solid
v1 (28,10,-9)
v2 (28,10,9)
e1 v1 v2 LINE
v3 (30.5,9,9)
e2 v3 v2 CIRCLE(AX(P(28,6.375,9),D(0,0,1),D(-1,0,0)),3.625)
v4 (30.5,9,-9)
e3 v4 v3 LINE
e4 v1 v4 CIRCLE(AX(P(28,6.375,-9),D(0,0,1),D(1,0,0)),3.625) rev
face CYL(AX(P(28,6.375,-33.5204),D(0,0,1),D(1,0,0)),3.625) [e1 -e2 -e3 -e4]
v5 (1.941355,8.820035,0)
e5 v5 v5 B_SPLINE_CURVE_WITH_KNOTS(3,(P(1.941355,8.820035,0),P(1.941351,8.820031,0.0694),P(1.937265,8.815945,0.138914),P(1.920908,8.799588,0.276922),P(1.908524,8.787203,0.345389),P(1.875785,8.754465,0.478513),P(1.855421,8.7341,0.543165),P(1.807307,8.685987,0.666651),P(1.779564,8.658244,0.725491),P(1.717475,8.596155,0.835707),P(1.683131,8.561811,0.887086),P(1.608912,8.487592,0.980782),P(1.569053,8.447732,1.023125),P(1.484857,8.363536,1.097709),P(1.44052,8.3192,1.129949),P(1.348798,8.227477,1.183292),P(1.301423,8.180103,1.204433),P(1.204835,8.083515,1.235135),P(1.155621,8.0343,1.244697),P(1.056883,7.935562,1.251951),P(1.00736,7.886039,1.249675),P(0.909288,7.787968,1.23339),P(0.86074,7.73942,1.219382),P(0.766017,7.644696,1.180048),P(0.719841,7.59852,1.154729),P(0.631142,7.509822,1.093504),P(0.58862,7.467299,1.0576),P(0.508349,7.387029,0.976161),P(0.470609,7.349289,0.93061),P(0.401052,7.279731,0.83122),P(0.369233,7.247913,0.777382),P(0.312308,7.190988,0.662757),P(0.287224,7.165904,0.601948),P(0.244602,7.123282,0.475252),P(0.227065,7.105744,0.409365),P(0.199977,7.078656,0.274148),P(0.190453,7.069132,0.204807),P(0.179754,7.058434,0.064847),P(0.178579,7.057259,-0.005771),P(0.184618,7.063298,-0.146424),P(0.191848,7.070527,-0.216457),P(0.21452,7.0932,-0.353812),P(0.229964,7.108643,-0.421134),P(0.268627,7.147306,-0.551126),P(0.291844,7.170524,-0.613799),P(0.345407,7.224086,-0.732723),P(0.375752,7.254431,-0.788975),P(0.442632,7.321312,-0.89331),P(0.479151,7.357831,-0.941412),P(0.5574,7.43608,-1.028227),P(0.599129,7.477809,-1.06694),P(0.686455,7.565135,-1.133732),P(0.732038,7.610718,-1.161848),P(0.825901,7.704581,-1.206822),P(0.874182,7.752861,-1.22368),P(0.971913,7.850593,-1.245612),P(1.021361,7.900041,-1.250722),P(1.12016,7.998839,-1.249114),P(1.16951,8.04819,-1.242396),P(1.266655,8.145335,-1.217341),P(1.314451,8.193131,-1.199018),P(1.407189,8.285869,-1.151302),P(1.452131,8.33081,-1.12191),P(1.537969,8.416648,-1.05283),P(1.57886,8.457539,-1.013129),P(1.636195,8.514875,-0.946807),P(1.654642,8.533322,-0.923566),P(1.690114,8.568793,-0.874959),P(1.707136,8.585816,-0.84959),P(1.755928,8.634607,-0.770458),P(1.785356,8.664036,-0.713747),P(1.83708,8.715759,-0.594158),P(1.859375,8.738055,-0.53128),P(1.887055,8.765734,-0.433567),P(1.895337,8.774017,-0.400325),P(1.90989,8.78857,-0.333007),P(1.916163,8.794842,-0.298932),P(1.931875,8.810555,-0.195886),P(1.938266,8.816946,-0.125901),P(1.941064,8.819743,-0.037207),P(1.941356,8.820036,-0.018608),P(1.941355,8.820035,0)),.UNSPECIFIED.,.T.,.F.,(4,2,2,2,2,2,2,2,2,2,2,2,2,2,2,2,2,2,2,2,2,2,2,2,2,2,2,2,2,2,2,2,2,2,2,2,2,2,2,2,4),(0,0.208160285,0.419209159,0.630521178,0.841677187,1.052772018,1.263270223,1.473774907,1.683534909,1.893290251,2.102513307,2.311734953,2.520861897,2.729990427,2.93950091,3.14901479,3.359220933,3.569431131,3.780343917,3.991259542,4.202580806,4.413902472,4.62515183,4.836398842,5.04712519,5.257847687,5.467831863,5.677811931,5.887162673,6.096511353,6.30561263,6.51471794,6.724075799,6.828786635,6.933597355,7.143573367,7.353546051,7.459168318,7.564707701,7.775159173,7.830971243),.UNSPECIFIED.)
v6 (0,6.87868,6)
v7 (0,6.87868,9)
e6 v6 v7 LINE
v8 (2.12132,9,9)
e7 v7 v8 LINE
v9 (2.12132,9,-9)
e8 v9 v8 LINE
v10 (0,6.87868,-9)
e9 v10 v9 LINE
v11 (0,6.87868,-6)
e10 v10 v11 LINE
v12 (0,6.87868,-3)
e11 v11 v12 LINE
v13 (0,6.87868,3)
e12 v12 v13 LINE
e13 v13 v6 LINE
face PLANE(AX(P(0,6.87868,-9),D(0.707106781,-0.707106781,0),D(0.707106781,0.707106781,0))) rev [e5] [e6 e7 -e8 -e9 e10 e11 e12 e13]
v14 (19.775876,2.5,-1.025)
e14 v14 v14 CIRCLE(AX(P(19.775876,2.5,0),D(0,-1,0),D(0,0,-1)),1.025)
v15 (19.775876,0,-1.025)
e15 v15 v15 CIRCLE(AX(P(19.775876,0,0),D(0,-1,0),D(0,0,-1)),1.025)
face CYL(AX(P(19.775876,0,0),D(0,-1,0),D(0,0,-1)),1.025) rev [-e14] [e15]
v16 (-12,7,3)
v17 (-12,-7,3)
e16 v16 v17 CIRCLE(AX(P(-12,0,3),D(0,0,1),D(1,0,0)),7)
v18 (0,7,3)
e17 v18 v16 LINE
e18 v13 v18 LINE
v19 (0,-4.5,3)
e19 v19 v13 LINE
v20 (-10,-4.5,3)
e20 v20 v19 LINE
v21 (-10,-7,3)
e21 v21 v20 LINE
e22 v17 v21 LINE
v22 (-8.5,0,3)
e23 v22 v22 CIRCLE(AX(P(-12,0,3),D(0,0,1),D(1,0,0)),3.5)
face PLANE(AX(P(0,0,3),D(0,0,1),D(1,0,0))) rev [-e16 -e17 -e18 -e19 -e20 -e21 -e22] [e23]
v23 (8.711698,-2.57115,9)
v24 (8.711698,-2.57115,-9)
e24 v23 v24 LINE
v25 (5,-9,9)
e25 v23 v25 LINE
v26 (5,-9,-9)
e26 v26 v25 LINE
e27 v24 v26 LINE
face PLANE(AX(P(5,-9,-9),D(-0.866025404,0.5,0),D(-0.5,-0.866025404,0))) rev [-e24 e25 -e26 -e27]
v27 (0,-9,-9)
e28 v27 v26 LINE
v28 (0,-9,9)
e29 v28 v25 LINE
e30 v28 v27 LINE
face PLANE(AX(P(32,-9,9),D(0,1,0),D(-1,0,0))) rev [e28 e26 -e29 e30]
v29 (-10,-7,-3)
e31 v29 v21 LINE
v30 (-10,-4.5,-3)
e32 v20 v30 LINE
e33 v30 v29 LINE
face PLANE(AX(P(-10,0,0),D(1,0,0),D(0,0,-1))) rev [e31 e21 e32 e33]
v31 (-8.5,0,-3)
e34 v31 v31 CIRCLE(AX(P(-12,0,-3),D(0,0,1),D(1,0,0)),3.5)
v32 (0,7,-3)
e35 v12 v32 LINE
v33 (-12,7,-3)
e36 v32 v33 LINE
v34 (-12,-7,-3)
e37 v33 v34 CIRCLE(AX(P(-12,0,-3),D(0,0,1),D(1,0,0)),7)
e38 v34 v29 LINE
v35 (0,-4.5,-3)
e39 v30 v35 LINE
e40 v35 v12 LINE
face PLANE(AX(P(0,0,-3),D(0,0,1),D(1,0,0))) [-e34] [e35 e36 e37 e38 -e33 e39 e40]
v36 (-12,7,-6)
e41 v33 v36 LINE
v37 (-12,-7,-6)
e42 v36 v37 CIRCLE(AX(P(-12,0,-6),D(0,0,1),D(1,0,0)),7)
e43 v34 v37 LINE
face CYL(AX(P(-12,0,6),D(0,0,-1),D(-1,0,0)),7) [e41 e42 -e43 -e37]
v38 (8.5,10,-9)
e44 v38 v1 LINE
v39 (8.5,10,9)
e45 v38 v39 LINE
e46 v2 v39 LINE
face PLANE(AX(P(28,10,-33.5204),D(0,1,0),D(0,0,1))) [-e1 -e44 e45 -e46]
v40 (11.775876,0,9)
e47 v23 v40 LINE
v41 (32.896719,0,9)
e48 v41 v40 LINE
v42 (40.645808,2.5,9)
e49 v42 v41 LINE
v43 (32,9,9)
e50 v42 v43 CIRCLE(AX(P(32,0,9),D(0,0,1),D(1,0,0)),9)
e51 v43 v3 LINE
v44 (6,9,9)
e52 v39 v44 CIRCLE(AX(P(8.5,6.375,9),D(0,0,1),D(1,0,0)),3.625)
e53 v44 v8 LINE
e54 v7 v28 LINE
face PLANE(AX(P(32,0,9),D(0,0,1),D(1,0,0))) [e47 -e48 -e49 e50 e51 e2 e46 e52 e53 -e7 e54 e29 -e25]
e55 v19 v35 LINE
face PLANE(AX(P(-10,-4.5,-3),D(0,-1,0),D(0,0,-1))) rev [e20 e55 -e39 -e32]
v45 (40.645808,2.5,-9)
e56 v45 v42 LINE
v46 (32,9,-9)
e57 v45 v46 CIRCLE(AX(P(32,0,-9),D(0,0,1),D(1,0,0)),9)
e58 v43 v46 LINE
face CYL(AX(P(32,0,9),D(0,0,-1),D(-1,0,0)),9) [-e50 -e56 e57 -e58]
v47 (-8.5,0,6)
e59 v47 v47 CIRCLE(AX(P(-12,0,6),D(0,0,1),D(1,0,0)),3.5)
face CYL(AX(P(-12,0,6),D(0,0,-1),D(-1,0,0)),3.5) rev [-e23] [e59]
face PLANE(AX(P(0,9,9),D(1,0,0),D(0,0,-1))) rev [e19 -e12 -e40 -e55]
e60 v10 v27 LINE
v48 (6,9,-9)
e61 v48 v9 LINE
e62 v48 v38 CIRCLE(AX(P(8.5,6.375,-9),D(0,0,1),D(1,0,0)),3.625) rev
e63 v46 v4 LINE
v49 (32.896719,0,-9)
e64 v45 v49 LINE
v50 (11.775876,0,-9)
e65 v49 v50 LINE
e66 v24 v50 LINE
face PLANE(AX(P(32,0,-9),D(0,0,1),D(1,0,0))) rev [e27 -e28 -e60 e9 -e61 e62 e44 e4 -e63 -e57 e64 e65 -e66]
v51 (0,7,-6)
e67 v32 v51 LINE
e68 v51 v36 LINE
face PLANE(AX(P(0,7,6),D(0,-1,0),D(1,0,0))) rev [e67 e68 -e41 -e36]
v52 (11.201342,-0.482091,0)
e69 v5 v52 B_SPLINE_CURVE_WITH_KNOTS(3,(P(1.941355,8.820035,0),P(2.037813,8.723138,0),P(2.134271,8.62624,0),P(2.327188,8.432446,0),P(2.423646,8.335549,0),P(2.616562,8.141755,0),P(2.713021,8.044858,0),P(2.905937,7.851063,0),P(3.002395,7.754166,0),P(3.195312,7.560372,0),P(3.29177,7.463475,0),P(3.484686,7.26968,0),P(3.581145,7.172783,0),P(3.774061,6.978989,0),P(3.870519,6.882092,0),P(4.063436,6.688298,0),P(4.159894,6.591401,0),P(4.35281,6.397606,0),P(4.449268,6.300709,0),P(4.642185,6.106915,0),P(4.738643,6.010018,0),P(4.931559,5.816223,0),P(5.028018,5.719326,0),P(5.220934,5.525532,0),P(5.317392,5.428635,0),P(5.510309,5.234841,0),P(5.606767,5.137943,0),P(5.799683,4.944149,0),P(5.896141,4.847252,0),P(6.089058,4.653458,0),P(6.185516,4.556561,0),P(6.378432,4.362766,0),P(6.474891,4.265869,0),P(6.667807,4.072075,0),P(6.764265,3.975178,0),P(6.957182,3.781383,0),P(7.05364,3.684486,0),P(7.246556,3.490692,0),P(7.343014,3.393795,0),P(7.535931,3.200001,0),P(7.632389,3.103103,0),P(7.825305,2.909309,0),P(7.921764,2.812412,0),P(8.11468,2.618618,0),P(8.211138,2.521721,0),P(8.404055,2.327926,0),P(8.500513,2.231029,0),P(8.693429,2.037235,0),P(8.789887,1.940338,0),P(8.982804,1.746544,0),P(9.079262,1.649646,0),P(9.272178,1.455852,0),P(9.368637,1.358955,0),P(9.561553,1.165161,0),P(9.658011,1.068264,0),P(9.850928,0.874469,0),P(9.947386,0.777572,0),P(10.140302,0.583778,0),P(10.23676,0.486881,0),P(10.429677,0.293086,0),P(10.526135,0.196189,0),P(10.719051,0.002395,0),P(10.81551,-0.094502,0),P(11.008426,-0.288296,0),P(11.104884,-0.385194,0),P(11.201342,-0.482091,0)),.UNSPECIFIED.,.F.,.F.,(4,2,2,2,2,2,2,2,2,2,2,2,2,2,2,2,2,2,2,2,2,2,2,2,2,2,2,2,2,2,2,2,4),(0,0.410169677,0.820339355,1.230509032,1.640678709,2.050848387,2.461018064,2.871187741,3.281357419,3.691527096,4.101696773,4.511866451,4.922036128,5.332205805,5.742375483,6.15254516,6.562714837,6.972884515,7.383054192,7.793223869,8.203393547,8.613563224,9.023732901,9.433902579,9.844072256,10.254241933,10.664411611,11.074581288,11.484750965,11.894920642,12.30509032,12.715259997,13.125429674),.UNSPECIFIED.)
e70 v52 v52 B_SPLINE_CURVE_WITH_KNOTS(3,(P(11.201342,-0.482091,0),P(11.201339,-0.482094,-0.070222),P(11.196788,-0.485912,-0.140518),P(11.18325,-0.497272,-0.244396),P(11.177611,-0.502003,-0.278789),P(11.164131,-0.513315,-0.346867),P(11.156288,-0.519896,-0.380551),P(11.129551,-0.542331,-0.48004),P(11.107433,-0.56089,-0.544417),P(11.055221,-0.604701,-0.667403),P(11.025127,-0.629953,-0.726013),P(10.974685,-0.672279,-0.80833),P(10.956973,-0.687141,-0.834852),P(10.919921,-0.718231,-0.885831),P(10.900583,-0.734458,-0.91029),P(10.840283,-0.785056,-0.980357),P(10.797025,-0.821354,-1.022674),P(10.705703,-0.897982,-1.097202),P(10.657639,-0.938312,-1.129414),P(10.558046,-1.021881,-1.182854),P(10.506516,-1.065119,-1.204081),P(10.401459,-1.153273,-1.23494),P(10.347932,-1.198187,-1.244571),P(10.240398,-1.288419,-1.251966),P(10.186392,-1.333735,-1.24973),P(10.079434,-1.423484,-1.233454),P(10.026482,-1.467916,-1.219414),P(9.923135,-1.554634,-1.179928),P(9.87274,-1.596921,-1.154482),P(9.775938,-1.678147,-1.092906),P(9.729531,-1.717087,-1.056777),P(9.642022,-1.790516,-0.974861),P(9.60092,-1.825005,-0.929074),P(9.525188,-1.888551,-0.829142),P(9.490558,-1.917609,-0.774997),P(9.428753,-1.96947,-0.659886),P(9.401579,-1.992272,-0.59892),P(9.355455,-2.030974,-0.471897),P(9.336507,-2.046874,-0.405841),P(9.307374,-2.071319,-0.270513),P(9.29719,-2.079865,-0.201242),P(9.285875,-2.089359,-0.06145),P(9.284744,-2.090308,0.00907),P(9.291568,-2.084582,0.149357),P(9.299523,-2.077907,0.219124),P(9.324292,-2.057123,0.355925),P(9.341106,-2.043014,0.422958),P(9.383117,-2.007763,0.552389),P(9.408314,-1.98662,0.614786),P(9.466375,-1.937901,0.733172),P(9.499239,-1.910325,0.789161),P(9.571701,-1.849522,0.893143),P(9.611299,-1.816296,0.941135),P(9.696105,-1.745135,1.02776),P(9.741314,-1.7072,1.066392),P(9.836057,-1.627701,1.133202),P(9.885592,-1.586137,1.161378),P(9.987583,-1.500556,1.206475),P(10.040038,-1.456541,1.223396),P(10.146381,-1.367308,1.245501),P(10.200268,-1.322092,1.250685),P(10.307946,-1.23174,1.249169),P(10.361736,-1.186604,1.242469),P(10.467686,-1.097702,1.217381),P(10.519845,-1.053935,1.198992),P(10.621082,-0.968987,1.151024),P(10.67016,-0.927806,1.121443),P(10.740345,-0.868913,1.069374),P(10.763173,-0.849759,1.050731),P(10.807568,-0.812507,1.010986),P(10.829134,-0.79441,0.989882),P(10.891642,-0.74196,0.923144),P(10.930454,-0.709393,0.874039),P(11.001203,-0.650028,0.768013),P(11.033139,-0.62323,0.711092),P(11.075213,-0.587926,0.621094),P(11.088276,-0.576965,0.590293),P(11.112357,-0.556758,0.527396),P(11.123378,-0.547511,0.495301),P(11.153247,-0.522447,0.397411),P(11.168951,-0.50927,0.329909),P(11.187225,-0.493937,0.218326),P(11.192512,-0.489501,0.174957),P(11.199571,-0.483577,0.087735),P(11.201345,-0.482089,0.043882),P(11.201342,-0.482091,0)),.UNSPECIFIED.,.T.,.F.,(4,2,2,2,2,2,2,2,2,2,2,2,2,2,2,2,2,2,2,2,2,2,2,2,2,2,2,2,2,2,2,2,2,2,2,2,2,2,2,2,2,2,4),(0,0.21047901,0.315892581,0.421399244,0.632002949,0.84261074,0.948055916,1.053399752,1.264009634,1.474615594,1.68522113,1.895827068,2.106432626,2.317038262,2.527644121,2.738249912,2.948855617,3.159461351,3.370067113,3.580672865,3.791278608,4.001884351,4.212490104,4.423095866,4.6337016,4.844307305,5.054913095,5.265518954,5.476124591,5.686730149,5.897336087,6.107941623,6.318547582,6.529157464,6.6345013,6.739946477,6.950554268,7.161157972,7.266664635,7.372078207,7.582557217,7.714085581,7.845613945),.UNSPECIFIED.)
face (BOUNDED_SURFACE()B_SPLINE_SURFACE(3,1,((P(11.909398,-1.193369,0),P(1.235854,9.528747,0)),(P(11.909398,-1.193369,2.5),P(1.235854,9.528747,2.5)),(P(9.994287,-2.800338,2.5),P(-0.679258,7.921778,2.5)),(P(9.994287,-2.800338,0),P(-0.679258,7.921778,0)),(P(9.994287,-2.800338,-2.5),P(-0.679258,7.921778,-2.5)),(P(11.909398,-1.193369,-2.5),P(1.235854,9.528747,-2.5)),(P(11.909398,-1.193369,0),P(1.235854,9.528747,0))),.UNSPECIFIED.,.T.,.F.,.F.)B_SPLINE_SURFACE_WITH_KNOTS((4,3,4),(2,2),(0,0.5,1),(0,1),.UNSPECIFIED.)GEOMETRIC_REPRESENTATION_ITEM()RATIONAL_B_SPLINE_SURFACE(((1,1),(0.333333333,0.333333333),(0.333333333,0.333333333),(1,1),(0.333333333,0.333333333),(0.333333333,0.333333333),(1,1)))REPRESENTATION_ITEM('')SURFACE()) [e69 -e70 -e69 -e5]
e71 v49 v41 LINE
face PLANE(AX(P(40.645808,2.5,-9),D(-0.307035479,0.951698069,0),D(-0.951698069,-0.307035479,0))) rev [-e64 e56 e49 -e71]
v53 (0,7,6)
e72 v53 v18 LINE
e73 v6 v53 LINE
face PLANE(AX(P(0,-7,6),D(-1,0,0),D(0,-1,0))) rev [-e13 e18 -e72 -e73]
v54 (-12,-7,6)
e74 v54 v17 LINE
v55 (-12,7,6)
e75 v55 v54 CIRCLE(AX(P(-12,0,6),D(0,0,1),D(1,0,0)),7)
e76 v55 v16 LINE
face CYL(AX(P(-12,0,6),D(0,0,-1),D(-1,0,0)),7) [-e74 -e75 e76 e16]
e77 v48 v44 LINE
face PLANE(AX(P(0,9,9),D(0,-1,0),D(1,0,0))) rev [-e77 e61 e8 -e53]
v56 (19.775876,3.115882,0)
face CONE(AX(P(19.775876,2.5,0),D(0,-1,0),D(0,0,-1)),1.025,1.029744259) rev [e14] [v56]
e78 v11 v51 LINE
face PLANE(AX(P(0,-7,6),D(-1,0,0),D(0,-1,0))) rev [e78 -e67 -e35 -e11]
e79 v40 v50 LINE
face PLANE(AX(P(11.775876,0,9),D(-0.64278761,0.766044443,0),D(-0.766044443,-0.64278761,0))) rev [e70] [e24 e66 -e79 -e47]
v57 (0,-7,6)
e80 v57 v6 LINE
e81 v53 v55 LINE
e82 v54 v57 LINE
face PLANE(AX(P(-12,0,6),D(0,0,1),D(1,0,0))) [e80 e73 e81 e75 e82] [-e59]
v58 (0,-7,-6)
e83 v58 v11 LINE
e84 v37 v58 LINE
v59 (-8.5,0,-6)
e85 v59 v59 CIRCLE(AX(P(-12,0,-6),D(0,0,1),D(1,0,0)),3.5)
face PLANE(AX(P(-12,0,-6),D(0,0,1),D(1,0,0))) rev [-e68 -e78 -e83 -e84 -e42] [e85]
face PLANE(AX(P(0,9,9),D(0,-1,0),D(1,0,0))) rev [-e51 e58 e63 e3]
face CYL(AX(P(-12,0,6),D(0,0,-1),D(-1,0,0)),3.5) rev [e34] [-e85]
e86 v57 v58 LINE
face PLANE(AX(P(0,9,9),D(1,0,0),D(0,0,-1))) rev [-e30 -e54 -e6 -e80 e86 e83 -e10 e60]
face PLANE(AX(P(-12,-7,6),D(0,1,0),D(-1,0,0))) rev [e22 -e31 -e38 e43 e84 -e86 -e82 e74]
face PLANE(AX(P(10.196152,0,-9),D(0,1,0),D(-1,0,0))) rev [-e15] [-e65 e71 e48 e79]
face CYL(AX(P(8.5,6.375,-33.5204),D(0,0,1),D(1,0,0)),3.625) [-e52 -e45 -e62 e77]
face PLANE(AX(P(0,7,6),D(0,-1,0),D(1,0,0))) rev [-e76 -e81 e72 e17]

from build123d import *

# Parameters (mm, degrees)
EXTRUDE_472_DEPTH        = 9
CUT_EXTRUDE_914_DEPTH    = 46.672748987
EXTRUDE_3_DEPTH          = 18
CUT_EXTRUDE_3_DEPTH      = 46.564039844
EXTRUDE_5_DEPTH          = 9
SWEEP_START              = -4.881222858
SWEEP_1_DEPTH            = 13.189100313
SKETCH_5_R               = 3.5
EXTRUDE_2_DEPTH          = 6
SKETCH_11_W              = 23.723512942
SKETCH_11_H              = 14
CUT_EXTRUDE_4_DEPTH      = 3
SKETCH_12_W              = 6
SKETCH_12_H              = 2.5
EXTRUDE_4_DEPTH          = 10
HOLE_WIZARD_M2_5_2_D     = 2.05
HOLE_WIZARD_M2_5_2_DEPTH = 2.5
HOLE_WIZARD_M2_5_2_TIP   = 0.615882135


with BuildPart() as part:
    # 草图1 → Extrude 472 (new, symmetric)
    with BuildSketch(Plane.XY):
        with BuildLine():
            Line((0, 9), (32, 9))
            ThreePointArc((32, 9), (41, 0), (32, -9))
            Line((32, -9), (0, -9))
            Line((0, -9), (0, 9))
        make_face()
    extrude(amount=EXTRUDE_472_DEPTH, both=True)

    # 草图13 → Cut-Extrude 914 (cut, through all)
    with BuildSketch(Plane.XY.offset(9)):
        with BuildLine():
            Line((5, -9), (32, -9))
            ThreePointArc((32, -9), (39.193747285, -5.408326913), (40.645808233, 2.5))
            Line((40.645808233, 2.5), (32.896719487, 0))
            Line((32.896719487, 0), (10.196152423, 0))
            Line((10.196152423, 0), (5, -9))
        make_face()
    extrude(amount=-CUT_EXTRUDE_914_DEPTH, mode=Mode.SUBTRACT)

    # 草图6 → 凸台-拉伸3 (add)
    with BuildSketch(Plane.XY.offset(9)):
        with BuildLine():
            Line((28, 10), (8.5, 10))
            ThreePointArc((8.5, 10), (7.153708798, 9.740728004), (6, 9))
            Line((6, 9), (30.5, 9))
            ThreePointArc((30.5, 9), (29.346291202, 9.740728004), (28, 10))
        make_face()
    extrude(amount=-EXTRUDE_3_DEPTH)

    # 草图7 → 切除-拉伸3 (cut, through all)
    with BuildSketch(Plane.XY.offset(9)):
        Polygon((2.121320344, 9), (0, 9), (0, 6.878679656), align=None)
    extrude(amount=-CUT_EXTRUDE_3_DEPTH, mode=Mode.SUBTRACT)

    # 草图14 → 凸台-拉伸5 (add, symmetric)
    with BuildSketch(Plane.XY):
        Polygon((11.775875797, 0), (8.711698025, -2.571150439), (8.711698025, 0), align=None)
    extrude(amount=EXTRUDE_5_DEPTH, both=True)

    # 切除-扫描1: read off the stored shape, not the designer's step
    # 切除-扫描1 outline → 切除-扫描1 (cut)
    with BuildSketch(Plane(origin=(0, 0, 0), x_dir=(0.7087101663277271, 0.7054997520507894, 0), z_dir=(0.7054997520507895, -0.708710166327727, 0)).offset(SWEEP_START)):
        with BuildLine():
            add(Edge.make_bspline(
                [(7.598390407, 0), (7.598390407, 2.5), (5.107415447, 2.5), (5.107415447, 0), (5.107415447, -2.5), (7.598390407, -2.5), (7.598390407, 0)],
                knots=[0, 0, 0, 0, 0.5, 0.5, 0.5, 1, 1, 1, 1], degree=3, weights=[1, 0.333333333, 0.333333333, 1, 0.333333333, 0.333333333, 1]))
        make_face()
    extrude(amount=SWEEP_1_DEPTH, mode=Mode.SUBTRACT)

    # 草图5 → 凸台-拉伸2 (add, symmetric)
    with BuildSketch(Plane.XY):
        with BuildLine():
            Line((0, 7), (-12, 7))
            ThreePointArc((-12, 7), (-19, 0), (-12, -7))
            Line((-12, -7), (0, -7))
            Line((0, -7), (0, 7))
        make_face()
        with Locations((-12, 0)):
            Circle(SKETCH_5_R, mode=Mode.SUBTRACT)
    extrude(amount=EXTRUDE_2_DEPTH, both=True)

    # 草图11 → 切除-拉伸4 (cut, symmetric)
    with BuildSketch(Plane.XY):
        with Locations((-11.861756471, 0)):
            Rectangle(SKETCH_11_W, SKETCH_11_H)
    extrude(amount=CUT_EXTRUDE_4_DEPTH, both=True, mode=Mode.SUBTRACT)

    # 草图12 → 凸台-拉伸4 (add)
    with BuildSketch(Plane.ZY):
        with Locations((0, -5.75)):
            Rectangle(SKETCH_12_W, SKETCH_12_H)
    extrude(amount=EXTRUDE_4_DEPTH)

    # M2.5 螺纹孔2
    with Locations(Plane(origin=(19.775875797, 0, 0), x_dir=(0, 0, -1), z_dir=(0, -1, 0))):
        with Locations((0, 0)):
            Hole(HOLE_WIZARD_M2_5_2_D / 2, depth=HOLE_WIZARD_M2_5_2_DEPTH)
            with Locations((0, 0, -(HOLE_WIZARD_M2_5_2_DEPTH + HOLE_WIZARD_M2_5_2_TIP / 2))):  # 118° drill point
                Cone(0, HOLE_WIZARD_M2_5_2_D / 2, HOLE_WIZARD_M2_5_2_TIP, mode=Mode.SUBTRACT)


solid = part.part
